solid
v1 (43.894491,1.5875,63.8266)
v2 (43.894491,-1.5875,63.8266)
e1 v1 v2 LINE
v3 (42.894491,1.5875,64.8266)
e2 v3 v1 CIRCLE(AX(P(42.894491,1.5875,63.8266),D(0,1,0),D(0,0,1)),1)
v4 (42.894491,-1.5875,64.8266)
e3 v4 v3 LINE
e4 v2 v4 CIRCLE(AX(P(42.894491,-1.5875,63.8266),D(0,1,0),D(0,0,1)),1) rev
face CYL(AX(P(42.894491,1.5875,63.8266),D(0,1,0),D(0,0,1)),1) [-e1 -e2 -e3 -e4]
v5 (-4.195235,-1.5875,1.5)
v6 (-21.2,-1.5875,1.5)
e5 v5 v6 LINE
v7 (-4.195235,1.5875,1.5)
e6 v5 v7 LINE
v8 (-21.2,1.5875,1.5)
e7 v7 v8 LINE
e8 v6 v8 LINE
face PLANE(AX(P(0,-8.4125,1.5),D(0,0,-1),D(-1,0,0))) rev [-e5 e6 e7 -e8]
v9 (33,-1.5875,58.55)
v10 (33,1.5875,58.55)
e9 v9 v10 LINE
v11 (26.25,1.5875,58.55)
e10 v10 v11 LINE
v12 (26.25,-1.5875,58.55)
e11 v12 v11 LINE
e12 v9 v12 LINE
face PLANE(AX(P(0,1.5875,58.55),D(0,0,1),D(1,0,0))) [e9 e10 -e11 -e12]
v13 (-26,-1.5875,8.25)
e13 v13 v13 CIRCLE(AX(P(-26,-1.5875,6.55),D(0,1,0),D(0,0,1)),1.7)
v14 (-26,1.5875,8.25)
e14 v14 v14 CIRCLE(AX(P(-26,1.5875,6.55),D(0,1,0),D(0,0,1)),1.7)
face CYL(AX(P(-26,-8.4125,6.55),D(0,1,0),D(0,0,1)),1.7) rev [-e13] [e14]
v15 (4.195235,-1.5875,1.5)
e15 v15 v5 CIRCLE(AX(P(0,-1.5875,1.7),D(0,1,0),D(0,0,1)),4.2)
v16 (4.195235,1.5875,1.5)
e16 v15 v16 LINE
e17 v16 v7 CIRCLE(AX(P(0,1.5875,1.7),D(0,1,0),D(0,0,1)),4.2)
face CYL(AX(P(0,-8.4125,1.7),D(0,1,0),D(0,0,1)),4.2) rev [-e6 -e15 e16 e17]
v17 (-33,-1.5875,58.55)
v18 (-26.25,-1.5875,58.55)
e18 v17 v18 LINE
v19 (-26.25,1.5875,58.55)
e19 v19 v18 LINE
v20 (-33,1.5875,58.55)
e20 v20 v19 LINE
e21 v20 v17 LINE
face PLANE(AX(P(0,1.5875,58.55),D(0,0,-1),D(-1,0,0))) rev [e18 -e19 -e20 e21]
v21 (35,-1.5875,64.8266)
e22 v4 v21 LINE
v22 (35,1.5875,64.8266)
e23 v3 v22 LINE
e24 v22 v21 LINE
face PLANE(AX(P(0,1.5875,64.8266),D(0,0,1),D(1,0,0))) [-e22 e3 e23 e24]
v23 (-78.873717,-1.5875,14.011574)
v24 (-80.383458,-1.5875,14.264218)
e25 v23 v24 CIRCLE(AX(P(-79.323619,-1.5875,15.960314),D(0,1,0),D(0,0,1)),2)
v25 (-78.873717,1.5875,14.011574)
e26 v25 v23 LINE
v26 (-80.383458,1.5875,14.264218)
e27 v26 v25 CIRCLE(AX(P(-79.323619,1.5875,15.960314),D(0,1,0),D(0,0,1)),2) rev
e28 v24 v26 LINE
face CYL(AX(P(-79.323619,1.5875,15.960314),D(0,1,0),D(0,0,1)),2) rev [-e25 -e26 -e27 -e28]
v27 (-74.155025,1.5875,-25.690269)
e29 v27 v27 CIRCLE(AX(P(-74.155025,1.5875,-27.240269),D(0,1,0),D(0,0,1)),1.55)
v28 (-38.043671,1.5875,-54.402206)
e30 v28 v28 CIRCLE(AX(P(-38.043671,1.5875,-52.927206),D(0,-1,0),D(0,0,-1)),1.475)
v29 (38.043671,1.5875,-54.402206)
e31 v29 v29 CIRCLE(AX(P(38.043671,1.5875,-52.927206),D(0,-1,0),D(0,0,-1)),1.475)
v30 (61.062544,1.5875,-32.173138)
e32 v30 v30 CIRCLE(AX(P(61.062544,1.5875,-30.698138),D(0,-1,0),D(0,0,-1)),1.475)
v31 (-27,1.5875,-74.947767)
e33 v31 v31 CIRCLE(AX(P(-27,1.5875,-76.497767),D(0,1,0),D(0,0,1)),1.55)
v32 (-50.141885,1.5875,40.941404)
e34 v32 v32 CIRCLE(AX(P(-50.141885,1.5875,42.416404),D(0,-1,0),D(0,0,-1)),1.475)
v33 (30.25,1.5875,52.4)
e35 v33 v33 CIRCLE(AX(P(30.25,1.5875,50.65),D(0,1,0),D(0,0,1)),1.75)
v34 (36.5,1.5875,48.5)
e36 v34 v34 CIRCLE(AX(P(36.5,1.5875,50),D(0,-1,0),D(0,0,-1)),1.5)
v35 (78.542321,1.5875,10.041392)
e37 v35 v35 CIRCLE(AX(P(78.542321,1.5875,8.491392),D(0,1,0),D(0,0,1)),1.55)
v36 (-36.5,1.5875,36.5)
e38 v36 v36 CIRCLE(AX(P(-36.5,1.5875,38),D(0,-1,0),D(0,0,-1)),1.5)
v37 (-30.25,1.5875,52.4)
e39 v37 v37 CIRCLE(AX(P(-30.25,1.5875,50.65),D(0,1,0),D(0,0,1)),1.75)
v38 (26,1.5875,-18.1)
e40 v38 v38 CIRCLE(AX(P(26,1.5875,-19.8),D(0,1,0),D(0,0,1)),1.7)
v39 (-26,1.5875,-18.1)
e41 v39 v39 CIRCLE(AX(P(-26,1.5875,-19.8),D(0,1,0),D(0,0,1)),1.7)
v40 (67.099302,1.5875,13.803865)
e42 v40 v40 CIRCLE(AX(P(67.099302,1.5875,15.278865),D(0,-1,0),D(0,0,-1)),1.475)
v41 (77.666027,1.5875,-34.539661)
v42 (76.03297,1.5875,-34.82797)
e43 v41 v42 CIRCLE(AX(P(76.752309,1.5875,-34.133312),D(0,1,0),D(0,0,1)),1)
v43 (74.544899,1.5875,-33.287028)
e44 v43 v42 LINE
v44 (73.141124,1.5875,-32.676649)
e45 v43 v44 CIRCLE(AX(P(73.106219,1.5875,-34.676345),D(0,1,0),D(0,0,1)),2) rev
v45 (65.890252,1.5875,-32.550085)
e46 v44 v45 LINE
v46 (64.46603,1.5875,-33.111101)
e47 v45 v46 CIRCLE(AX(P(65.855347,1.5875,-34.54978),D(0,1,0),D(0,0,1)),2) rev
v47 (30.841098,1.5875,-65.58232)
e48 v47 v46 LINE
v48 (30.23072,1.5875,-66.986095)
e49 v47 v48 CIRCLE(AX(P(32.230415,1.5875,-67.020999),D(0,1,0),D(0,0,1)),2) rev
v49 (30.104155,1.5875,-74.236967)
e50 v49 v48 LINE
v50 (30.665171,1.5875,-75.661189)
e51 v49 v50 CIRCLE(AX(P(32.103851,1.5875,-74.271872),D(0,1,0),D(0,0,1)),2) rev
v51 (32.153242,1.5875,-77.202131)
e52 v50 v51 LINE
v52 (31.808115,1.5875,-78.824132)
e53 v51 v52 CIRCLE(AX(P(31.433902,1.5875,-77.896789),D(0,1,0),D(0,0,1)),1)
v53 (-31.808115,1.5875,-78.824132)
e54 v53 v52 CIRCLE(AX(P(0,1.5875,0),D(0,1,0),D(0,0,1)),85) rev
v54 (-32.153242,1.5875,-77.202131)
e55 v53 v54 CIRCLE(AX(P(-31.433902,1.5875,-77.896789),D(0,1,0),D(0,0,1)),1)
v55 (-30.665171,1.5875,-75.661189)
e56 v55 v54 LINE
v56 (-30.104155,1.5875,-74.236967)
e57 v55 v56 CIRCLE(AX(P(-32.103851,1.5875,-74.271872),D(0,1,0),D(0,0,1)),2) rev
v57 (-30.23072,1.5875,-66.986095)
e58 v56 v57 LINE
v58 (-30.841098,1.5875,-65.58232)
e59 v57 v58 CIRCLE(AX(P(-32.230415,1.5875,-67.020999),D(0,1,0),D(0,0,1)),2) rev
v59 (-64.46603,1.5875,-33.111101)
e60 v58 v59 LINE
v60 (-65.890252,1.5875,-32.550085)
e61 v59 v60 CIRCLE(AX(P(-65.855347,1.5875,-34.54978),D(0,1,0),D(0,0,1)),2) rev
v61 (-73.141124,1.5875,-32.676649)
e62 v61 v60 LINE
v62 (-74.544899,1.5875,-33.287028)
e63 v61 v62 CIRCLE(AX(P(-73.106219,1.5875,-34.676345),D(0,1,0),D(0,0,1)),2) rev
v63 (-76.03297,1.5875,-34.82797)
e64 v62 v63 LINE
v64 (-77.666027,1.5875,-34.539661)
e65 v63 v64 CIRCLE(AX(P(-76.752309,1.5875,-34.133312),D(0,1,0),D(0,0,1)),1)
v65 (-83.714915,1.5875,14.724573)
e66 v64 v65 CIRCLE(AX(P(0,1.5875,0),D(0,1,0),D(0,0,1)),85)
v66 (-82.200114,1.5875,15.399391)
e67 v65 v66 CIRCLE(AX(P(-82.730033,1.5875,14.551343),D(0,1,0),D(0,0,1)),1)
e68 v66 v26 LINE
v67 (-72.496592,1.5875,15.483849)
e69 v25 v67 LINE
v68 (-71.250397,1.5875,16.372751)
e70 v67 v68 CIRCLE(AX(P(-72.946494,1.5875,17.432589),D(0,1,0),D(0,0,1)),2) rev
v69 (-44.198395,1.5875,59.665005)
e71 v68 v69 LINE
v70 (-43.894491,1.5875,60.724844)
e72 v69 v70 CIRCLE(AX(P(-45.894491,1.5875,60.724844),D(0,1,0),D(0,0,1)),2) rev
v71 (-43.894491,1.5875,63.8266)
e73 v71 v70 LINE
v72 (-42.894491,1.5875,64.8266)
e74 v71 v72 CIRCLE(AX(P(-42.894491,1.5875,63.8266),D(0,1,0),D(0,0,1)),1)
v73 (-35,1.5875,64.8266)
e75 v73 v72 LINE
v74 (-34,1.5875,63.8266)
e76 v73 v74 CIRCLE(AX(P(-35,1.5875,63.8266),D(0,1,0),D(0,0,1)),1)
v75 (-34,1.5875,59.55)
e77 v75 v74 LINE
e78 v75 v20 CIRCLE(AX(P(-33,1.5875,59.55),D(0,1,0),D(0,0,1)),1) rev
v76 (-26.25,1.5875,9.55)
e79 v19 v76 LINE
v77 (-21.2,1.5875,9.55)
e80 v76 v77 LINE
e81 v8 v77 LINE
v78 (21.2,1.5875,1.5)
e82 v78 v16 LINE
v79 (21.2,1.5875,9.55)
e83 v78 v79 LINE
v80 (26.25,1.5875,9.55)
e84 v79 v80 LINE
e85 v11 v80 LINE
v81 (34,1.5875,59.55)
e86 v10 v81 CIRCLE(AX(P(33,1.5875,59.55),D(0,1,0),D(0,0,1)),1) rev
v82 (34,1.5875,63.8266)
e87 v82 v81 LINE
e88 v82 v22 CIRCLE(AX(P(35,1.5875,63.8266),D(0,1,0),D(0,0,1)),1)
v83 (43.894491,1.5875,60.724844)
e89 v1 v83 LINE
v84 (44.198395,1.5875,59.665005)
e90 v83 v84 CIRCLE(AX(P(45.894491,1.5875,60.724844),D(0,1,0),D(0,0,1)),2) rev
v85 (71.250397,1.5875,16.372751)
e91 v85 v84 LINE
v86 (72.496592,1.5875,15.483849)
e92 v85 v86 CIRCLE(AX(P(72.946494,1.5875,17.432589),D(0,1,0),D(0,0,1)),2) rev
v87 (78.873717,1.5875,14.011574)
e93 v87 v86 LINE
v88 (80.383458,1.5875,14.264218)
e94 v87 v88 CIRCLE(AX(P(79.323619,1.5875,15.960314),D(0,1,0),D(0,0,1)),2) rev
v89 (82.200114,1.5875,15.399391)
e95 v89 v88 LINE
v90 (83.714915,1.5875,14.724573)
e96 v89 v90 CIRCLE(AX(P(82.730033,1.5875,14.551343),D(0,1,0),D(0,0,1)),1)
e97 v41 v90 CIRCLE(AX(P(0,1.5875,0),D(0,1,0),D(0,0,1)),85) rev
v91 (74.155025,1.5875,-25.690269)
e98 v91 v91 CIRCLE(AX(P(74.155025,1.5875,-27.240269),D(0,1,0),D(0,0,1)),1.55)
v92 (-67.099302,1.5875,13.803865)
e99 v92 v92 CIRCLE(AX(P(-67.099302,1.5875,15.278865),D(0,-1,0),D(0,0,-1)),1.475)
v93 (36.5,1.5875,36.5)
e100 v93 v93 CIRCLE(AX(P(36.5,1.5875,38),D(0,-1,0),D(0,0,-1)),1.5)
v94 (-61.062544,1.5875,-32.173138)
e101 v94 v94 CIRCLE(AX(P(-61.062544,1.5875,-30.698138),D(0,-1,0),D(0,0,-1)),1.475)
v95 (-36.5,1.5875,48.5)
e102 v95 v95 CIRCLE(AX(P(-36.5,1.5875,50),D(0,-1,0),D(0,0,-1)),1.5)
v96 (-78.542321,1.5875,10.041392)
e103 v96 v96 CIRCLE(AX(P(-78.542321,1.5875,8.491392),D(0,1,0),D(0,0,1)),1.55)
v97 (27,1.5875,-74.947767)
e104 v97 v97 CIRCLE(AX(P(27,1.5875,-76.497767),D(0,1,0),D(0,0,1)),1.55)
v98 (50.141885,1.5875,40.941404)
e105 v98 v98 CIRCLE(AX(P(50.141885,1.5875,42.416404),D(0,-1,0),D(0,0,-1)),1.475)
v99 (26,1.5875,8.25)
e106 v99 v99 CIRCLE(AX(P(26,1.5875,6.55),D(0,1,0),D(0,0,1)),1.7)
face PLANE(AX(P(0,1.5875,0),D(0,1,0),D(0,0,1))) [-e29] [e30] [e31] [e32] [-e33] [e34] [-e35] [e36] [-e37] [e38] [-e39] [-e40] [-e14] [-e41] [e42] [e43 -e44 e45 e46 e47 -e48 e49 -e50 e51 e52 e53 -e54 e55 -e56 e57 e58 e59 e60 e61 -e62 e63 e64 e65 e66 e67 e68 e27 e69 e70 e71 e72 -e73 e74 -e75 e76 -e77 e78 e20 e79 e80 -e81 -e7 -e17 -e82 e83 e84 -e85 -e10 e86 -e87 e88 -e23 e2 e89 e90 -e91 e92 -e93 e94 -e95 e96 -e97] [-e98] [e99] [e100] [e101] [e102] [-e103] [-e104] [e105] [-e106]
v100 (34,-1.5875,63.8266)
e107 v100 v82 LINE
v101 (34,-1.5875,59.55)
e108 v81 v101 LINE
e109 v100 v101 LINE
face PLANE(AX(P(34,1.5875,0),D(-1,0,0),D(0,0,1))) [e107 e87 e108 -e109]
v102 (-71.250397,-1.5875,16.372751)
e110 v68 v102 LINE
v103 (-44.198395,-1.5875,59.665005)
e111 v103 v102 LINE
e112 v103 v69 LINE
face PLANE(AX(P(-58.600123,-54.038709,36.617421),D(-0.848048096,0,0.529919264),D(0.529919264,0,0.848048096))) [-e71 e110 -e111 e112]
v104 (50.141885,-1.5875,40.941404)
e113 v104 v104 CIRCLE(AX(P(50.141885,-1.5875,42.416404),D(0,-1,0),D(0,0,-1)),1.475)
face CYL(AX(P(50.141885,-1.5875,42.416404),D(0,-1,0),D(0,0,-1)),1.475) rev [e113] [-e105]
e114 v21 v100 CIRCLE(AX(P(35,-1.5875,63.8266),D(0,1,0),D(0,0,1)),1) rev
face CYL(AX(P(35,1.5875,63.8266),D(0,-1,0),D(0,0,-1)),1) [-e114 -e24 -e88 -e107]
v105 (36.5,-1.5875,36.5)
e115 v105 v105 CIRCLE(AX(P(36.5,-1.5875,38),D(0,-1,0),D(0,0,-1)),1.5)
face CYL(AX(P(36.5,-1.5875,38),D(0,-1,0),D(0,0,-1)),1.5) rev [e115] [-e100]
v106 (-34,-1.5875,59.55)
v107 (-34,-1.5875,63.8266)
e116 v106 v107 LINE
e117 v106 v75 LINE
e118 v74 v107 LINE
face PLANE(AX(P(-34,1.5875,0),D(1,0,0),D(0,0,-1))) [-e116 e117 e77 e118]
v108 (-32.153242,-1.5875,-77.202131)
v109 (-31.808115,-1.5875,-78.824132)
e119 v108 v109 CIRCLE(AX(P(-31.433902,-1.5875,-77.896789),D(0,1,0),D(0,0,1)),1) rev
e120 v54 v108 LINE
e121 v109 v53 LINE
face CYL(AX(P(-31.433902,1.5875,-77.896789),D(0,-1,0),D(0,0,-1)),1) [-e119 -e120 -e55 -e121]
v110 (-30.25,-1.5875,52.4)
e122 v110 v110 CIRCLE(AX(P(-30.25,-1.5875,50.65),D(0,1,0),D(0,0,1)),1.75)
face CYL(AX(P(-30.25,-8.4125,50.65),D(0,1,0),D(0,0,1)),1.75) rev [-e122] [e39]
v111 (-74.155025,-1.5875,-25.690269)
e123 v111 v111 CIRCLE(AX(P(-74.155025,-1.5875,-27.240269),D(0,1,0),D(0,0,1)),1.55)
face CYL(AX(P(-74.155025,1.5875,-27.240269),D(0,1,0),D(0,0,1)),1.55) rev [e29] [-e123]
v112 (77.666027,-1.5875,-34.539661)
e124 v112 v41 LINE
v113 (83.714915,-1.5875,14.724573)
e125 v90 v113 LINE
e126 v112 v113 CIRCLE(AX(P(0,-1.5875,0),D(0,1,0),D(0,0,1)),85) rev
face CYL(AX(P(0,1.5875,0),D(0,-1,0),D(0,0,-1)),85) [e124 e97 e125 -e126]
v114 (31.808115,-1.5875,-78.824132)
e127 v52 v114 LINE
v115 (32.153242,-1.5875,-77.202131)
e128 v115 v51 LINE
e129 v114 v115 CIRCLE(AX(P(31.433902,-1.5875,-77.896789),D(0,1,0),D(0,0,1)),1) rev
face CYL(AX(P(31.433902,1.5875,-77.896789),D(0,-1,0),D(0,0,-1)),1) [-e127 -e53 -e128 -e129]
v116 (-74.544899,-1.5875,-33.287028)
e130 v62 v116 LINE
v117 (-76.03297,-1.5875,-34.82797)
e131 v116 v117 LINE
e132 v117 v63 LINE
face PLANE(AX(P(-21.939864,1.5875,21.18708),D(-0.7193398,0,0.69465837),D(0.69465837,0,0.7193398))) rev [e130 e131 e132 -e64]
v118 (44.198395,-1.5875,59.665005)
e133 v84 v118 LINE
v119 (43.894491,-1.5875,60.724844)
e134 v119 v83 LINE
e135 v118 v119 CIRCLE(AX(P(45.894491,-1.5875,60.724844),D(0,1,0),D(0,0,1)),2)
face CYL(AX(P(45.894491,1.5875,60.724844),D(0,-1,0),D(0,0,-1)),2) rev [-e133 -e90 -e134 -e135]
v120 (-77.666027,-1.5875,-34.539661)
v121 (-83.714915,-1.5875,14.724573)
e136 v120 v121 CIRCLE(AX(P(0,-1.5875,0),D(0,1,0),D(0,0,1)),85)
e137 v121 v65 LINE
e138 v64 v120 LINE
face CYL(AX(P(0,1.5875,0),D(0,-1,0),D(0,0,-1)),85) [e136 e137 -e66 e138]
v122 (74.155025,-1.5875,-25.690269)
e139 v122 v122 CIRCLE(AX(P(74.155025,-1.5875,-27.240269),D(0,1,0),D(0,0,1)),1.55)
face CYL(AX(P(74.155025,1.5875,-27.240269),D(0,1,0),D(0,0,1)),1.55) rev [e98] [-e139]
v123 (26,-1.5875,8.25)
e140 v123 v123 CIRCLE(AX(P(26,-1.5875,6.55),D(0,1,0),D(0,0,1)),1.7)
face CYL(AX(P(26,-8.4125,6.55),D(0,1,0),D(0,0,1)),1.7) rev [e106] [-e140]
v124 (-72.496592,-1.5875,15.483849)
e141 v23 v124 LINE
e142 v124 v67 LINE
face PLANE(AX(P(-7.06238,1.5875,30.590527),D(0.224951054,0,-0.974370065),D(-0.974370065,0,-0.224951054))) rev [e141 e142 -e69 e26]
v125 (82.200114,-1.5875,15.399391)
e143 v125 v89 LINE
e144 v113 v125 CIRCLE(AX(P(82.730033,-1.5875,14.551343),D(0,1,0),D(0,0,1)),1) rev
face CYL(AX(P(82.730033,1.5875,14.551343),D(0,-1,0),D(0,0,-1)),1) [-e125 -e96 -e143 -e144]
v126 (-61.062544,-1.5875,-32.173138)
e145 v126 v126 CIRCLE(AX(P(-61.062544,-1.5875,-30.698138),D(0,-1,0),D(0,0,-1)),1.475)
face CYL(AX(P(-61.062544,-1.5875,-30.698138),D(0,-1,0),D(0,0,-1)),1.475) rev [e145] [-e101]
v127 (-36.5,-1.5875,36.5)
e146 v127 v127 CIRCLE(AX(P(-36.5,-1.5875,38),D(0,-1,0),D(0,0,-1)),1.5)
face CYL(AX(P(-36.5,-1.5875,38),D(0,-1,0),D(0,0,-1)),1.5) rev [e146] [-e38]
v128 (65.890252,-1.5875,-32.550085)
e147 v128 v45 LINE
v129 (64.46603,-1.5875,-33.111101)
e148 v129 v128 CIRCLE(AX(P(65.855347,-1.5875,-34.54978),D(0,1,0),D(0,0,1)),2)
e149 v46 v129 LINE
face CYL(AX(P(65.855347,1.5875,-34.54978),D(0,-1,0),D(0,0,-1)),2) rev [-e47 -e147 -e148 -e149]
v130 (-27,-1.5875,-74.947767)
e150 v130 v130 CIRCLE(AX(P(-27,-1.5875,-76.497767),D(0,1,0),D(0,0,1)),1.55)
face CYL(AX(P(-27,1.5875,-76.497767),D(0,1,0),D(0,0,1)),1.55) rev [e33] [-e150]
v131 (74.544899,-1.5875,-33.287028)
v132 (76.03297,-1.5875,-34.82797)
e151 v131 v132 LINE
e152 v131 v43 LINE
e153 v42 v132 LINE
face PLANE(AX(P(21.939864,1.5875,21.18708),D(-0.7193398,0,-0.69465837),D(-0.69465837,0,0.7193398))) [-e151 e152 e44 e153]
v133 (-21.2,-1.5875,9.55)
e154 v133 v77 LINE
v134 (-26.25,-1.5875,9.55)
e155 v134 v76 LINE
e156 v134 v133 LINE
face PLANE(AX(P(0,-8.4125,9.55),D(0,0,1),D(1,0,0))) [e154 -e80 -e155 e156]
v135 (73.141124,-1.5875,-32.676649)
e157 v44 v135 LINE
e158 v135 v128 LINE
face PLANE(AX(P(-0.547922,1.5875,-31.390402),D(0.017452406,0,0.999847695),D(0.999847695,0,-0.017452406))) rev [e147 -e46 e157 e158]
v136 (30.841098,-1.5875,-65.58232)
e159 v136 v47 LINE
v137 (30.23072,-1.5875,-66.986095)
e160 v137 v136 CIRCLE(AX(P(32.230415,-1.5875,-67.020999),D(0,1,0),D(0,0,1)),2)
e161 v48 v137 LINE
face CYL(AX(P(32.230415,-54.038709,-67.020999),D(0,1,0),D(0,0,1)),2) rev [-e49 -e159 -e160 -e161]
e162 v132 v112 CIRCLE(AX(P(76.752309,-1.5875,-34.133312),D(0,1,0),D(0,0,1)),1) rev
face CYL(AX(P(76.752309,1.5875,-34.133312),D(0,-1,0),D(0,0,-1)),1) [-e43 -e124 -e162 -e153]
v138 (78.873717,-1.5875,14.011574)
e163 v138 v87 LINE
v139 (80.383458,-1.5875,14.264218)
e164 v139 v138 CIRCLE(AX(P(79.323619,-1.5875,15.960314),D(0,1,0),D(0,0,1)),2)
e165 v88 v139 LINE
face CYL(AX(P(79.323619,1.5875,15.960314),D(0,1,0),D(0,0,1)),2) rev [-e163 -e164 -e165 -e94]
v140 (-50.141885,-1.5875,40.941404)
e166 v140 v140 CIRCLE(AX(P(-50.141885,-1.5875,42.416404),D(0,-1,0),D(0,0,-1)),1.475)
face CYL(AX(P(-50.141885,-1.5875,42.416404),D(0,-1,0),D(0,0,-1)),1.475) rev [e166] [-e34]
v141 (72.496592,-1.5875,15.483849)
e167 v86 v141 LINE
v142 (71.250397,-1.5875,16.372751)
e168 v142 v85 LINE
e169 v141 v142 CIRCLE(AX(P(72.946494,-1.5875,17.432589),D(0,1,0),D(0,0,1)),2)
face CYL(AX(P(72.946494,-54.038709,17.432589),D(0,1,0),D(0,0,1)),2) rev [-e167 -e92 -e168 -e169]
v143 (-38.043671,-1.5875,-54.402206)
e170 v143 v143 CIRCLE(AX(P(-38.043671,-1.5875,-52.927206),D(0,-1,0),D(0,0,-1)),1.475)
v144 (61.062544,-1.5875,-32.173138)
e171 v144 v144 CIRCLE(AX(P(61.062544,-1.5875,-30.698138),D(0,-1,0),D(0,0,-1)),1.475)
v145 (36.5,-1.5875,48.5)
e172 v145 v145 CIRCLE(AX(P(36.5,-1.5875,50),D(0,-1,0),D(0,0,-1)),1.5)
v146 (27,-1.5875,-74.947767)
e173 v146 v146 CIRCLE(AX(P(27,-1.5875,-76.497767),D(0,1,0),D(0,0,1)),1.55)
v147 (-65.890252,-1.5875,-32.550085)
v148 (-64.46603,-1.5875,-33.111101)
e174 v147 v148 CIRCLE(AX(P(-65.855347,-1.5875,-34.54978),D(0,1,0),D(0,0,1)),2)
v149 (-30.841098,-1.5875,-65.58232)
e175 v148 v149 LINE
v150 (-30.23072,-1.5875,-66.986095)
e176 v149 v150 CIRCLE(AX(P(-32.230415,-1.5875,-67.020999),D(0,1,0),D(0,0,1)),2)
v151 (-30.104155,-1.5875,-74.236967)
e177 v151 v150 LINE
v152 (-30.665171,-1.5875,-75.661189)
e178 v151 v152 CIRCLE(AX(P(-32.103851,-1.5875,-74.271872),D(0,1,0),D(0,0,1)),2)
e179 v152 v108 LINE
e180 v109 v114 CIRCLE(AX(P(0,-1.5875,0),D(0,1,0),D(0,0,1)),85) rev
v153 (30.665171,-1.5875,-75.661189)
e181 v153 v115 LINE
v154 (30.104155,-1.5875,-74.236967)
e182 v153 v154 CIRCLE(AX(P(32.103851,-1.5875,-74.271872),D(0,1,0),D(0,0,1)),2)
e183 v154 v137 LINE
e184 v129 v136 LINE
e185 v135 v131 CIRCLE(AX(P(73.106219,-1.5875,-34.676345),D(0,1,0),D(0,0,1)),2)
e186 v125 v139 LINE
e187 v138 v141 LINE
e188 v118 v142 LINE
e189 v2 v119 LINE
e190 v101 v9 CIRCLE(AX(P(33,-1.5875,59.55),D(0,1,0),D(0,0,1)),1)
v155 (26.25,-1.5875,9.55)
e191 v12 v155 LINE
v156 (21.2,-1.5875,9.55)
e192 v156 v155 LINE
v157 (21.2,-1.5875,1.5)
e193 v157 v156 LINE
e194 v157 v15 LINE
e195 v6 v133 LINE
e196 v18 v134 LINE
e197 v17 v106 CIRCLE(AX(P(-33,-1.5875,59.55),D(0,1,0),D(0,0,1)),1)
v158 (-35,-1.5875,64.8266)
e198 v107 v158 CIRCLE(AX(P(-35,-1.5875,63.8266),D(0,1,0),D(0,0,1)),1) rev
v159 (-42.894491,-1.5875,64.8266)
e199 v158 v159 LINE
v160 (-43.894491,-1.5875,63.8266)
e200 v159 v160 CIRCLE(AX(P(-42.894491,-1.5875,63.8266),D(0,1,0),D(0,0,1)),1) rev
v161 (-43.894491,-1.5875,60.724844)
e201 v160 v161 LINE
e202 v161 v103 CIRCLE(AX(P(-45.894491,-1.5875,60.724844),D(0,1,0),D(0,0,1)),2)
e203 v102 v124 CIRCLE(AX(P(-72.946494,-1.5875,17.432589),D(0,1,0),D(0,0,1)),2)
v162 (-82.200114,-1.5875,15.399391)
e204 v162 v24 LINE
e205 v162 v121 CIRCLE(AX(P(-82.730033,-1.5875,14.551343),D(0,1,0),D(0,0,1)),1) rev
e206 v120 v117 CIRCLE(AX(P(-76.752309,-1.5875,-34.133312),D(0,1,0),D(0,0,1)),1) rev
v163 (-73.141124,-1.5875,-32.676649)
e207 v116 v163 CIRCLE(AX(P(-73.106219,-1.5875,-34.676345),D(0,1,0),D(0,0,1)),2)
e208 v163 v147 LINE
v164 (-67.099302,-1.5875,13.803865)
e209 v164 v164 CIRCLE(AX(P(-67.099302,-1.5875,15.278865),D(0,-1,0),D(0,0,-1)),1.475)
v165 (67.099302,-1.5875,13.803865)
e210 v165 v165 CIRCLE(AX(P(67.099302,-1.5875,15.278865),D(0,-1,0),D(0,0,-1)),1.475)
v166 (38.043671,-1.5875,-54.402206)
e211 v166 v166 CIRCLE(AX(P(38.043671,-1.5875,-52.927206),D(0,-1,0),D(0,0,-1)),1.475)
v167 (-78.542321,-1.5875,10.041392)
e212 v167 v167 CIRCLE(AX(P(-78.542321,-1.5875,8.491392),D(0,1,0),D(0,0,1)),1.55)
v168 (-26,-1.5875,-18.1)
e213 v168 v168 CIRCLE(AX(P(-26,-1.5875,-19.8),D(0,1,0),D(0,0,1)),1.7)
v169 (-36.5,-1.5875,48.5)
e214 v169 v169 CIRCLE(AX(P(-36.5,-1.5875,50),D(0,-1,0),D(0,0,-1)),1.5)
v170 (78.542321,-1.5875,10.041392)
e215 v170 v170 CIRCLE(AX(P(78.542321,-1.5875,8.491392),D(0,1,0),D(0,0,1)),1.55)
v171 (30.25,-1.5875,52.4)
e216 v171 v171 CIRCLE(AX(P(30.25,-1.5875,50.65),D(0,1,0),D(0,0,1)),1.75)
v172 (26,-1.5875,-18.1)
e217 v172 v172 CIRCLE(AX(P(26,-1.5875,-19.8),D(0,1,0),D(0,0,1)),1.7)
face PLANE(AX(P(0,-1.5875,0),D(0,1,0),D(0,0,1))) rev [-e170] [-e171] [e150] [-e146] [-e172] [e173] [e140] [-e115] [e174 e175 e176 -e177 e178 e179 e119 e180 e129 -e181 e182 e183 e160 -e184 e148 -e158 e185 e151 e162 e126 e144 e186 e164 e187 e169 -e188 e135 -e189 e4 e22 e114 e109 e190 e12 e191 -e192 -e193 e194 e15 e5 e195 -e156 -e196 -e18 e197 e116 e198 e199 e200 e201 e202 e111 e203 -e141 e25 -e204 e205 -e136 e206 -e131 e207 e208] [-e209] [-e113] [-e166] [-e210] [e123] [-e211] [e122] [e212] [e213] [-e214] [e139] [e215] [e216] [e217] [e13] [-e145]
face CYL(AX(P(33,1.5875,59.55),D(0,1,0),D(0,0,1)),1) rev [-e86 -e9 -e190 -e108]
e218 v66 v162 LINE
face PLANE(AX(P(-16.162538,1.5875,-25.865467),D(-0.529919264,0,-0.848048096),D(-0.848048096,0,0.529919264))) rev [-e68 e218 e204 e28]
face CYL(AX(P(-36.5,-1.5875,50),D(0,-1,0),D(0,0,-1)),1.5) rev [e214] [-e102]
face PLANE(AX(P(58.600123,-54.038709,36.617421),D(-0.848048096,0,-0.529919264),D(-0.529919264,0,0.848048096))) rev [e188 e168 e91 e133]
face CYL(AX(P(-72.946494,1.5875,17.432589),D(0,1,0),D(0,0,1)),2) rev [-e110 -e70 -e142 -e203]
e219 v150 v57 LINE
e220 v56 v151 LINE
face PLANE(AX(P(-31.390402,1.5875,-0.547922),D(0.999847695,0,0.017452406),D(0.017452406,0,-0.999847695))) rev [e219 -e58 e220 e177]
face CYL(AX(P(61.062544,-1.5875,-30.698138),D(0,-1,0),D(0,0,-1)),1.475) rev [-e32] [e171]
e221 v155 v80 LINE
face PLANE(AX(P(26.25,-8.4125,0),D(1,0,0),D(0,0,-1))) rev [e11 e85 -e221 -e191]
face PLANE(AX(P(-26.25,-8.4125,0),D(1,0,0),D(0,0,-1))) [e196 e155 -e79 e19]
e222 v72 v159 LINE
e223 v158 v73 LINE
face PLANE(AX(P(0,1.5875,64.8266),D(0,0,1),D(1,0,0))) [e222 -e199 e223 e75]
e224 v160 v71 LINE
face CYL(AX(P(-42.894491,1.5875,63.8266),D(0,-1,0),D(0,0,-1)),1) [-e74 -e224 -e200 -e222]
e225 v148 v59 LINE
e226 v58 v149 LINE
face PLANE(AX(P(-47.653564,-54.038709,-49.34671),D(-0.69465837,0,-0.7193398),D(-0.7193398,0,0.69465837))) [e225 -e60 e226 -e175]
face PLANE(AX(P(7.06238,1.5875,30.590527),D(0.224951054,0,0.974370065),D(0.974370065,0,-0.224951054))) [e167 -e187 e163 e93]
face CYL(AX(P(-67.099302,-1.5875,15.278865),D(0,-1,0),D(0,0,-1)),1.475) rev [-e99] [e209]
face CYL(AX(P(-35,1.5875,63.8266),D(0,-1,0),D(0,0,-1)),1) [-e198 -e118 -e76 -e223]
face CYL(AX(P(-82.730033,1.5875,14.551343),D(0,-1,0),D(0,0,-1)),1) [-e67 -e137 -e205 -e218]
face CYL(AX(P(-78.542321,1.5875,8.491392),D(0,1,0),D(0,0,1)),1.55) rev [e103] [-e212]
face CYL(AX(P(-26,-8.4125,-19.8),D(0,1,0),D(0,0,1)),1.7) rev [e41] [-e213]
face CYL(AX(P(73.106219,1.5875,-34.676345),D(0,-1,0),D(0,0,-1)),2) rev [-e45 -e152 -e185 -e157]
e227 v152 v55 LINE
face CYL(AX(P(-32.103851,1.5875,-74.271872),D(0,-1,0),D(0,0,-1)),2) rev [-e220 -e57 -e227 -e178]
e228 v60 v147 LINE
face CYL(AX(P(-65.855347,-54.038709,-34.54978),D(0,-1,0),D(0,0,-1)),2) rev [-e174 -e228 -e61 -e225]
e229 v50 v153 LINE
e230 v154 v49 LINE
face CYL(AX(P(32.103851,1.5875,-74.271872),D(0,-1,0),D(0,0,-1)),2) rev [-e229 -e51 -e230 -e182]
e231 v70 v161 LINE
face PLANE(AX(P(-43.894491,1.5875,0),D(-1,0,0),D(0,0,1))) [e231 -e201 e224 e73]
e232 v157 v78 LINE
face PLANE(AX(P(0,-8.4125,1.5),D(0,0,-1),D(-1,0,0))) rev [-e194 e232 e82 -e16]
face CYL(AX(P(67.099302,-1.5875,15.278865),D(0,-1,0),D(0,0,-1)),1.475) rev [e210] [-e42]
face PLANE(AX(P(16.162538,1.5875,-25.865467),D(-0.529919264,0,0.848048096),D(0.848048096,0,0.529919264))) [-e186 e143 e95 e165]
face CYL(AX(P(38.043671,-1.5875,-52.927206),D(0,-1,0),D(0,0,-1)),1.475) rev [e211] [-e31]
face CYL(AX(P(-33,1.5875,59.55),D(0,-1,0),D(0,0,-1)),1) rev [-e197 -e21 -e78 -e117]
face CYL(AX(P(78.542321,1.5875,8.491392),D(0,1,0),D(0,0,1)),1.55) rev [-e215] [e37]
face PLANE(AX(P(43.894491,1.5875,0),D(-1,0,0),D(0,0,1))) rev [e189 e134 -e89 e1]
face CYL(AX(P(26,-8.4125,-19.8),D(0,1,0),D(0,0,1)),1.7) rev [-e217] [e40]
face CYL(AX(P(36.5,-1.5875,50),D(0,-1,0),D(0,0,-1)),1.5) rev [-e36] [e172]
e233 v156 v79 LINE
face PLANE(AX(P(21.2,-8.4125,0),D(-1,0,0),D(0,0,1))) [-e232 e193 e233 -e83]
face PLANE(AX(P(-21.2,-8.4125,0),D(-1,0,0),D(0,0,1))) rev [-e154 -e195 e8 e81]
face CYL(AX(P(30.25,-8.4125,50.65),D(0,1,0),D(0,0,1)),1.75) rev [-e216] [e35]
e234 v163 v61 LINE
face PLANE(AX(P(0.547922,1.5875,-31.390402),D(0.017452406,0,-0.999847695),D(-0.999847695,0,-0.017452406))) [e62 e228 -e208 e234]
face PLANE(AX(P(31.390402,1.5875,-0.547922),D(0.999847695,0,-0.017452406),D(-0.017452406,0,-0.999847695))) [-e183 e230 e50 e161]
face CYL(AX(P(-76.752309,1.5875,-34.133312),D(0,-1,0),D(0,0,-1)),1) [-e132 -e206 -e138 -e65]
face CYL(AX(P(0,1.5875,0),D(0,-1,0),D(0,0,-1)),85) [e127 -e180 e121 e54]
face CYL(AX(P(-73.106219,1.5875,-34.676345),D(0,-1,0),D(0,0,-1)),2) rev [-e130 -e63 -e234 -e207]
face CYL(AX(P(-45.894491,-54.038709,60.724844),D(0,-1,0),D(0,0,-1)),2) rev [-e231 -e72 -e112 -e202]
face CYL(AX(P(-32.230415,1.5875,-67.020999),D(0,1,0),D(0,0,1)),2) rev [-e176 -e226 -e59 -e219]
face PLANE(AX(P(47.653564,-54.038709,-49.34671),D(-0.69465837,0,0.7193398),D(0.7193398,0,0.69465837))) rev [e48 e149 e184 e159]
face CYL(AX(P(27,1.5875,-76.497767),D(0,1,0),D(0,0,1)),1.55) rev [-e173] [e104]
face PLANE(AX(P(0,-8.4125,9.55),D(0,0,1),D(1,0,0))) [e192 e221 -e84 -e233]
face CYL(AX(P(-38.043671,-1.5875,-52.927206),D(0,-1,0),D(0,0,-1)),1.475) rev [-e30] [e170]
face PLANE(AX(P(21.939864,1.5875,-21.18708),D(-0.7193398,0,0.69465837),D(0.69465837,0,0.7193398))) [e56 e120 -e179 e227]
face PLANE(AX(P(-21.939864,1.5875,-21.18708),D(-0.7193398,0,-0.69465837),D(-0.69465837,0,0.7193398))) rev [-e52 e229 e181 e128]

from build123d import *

# Parameters (mm, degrees)
BOSS_EXTRUDE4_DEPTH  = 1.5875
M3_CLEARANCE_HOLE3_D = 3
M3_CLEARANCE_HOLE1_D = 3.1
M3_CLEARANCE_HOLE4_D = 2.95
M3_CLEARANCE_HOLE2_D = 3.1
BOSS_EXTRUDE6_DEPTH  = 3.175
FILLET1_R            = 2
FILLET3_R            = 1
FILLET6_R            = 0.5
CUT_EXTRUDE4_DEPTH   = 10
SKETCH29_R           = 1.75
CUT_EXTRUDE5_DEPTH   = 10
SKETCH31_R           = 1.7
CUT_EXTRUDE7_DEPTH   = 10


with BuildPart() as part:
    # Sketch1 → Boss-Extrude4 (new, symmetric)
    with BuildSketch(Plane(origin=(0, 0, 0), x_dir=(1, 0, 0), z_dir=(0, 1, 0))):
        with BuildLine():
            Line((-62.799553621, 32.496136604), (-73.969425011, 32.691107434))
            Line((-73.969425011, 32.691107434), (-77.053684287, 35.88495141))
            ThreePointArc((-77.053684287, 35.88495141), (-84.36642289, 10.358894189), (-83.446216027, -16.178041625))
            Line((-83.446216027, -16.178041625), (-79.680911643, -13.825218315))
            Line((-79.680911643, -13.825218315), (-69.484649137, -16.179210996))
            Line((-69.484649137, -16.179210996), (-43.894490772, -57.132025032))
            Line((-43.894490772, -57.132025032), (-43.894490772, -64.826600275))
            Line((-43.894490772, -64.826600275), (-43.094490772, -64.826600275))
            Line((-43.094490772, -64.826600275), (-34, -64.826600275))
            Line((-34, -64.826600275), (-34, -59.55))
            Line((-34, -59.55), (-34, -58.55))
            Line((-34, -58.55), (-20, -58.55))
            Line((-20, -58.55), (-19.859459165, -59.55))
            Line((-19.859459165, -59.55), (19.859459165, -59.55))
            Line((19.859459165, -59.55), (20, -58.55))
            Line((20, -58.55), (34, -58.55))
            Line((34, -58.55), (34, -59.55))
            Line((34, -59.55), (34, -64.826600275))
            Line((34, -64.826600275), (43.094490772, -64.826600275))
            Line((43.094490772, -64.826600275), (43.894490772, -64.826600275))
            Line((43.894490772, -64.826600275), (43.894490772, -57.132025032))
            Line((43.894490772, -57.132025032), (69.484649137, -16.179210996))
            Line((69.484649137, -16.179210996), (79.680911643, -13.825218315))
            Line((79.680911643, -13.825218315), (83.446216027, -16.178041625))
            ThreePointArc((83.446216027, -16.178041625), (84.610662337, -8.126242604), (85, 0))
            ThreePointArc((85, 0), (82.98964744, 18.377116688), (77.053684287, 35.88495141))
            Line((77.053684287, 35.88495141), (73.969425011, 32.691107434))
            Line((73.969425011, 32.691107434), (62.799553621, 32.496136604))
            Line((62.799553621, 32.496136604), (30.284668021, 63.895396642))
            Line((30.284668021, 63.895396642), (30.089697191, 75.065268032))
            Line((30.089697191, 75.065268032), (33.173956467, 78.259112008))
            ThreePointArc((33.173956467, 78.259112008), (0, 85), (-33.173956467, 78.259112008))
            Line((-33.173956467, 78.259112008), (-30.089697191, 75.065268032))
            Line((-30.089697191, 75.065268032), (-30.284668021, 63.895396642))
            Line((-30.284668021, 63.895396642), (-62.799553621, 32.496136604))
        make_face()
    extrude(amount=BOSS_EXTRUDE4_DEPTH, both=True)

    # M3 Clearance Hole3 (through all)
    with Locations(Plane(origin=(0, -1.5875, 0), x_dir=(-1, 0, 0), z_dir=(0, -1, 0))):
        with Locations((36.5, -50), (36.5, -38), (-36.5, -50), (-36.5, -38)):
            Hole(M3_CLEARANCE_HOLE3_D / 2)

    # M3 Clearance Hole1 (through all)
    with Locations(Plane(origin=(0, 1.5875, 0), x_dir=(1, 0, 0), z_dir=(0, 1, 0))):
        with Locations((-78.542321426, -8.49139241), (78.542321426, -8.49139241), (74.155025063, 27.240269049), (-74.155025063, 27.240269049)):
            Hole(M3_CLEARANCE_HOLE1_D / 2)

    # M3 Clearance Hole4 (through all)
    with Locations(Plane(origin=(0, -1.5875, 0), x_dir=(-1, 0, 0), z_dir=(0, -1, 0))):
        with Locations((-67.099301622, -15.278865202), (-50.141885166, -42.416404279), (-61.062544382, 30.698137949), (-38.043670771, 52.927205804), (50.141885166, -42.416404279), (67.099301622, -15.278865202), (38.043670771, 52.927205804), (61.062544382, 30.698137949)):
            Hole(M3_CLEARANCE_HOLE4_D / 2)

    # M3 Clearance Hole2 (through all)
    with Locations(Plane(origin=(0, 1.5875, 0), x_dir=(1, 0, 0), z_dir=(0, 1, 0))):
        with Locations((27, 76.497766718), (-27, 76.497766718)):
            Hole(M3_CLEARANCE_HOLE2_D / 2)

    # Sketch22 → Boss-Extrude6 (add)
    with BuildSketch(Plane(origin=(0, 1.5875, 0), x_dir=(1, 0, 0), z_dir=(0, 1, 0))):
        Polygon((65.061950694, 32.535626892), (30.245177733, 66.157793715), (30.284668021, 63.895396642), (62.799553621, 32.496136604), align=None)
        Polygon((-30.284668021, 63.895396642), (-30.245177733, 66.157793715), (-65.061950694, 32.535626892), (-62.799553621, 32.496136604), align=None)
        Polygon((43.894490772, -60.151352895), (71.689396914, -15.670204865), (69.484649137, -16.179210996), (43.894490772, -57.132025032), align=None)
        Polygon((-69.484649137, -16.179210996), (-71.689396914, -15.670204865), (-43.894490772, -60.151352895), (-43.894490772, -57.132025032), align=None)
    extrude(amount=-BOSS_EXTRUDE6_DEPTH)

    # Fillet1
    fillet1_edges = [part.edges().sort_by_distance(p)[0] for p in [
        (-30.245177733, 0.79375, -66.157793715),
        (-65.061950694, 0.79375, -32.535626892),
        (-71.689396914, 0.79375, 15.670204865),
        (-43.894490772, 0.79375, 60.151352895),
        (43.894490772, -0.79375, 60.151352895),
        (71.689396914, -0.79375, 15.670204865),
        (65.061950694, 0.79375, -32.535626892),
        (30.245177733, -0.79375, -66.157793715),
        (30.089697191, -0.79375, -75.065268032),
        (73.969425011, -0.79375, -32.691107434),
        (79.680911643, -0.79375, 13.825218315),
        (-79.680911643, -0.79375, 13.825218315),
        (-73.969425011, -0.79375, -32.691107434),
        (-30.089697191, -0.79375, -75.065268032),
    ]]
    fillet(fillet1_edges, radius=FILLET1_R)

    # Fillet3
    fillet3_edges = [part.edges().sort_by_distance(p)[0] for p in [
        (33.173956467, -0.79375, -78.259112008),
        (77.053684287, 0.79375, -35.88495141),
        (83.446216027, -0.79375, 16.178041625),
        (43.894490772, -0.79375, 64.826600275),
        (34, 0.79375, 64.826600275),
        (34, -0.79375, 58.55),
        (-34, -0.79375, 58.55),
        (-34, 0.79375, 64.826600275),
        (-43.894490772, -0.79375, 64.826600275),
        (-83.446216027, -0.79375, 16.178041625),
        (-77.053684287, -0.79375, -35.88495141),
        (-33.173956467, -0.79375, -78.259112008),
    ]]
    fillet(fillet3_edges, radius=FILLET3_R - 0.0001)  # a hair under: the kernel refuses the full size

    # Fillet6
    fillet6_edges = [part.edges().sort_by_distance(p)[0] for p in [
        (20, -0.79375, 58.55),
        (19.859459165, -0.79375, 59.55),
        (-19.859459165, 0.79375, 59.55),
        (-20, 0.79375, 58.55),
    ]]
    fillet(fillet6_edges, radius=FILLET6_R)

    # Sketch28 → Cut-Extrude4 (cut)
    with BuildSketch(Plane(origin=(0, 1.5875, 0), x_dir=(1, 0, 0), z_dir=(0, 1, 0))):
        with BuildLine():
            Line((-26.25, -9.55), (-26.25, -59.55))
            Line((-26.25, -59.55), (26.25, -59.55))
            Line((26.25, -59.55), (26.25, -9.55))
            Line((26.25, -9.55), (21.2, -9.55))
            Line((21.2, -9.55), (21.2, -1.5))
            Line((21.2, -1.5), (4.195235393, -1.5))
            ThreePointArc((4.195235393, -1.5), (0, 2.5), (-4.195235393, -1.5))
            Line((-4.195235393, -1.5), (-21.2, -1.5))
            Line((-21.2, -1.5), (-21.2, -9.55))
            Line((-21.2, -9.55), (-26.25, -9.55))
        make_face()
    extrude(amount=-CUT_EXTRUDE4_DEPTH, mode=Mode.SUBTRACT)

    # Sketch29 → Cut-Extrude5 (cut)
    with BuildSketch(Plane(origin=(0, 1.5875, 0), x_dir=(1, 0, 0), z_dir=(0, 1, 0))):
        with Locations(Location((30.25, -50.65, 0), (0, 0, 270))):
            Circle(SKETCH29_R)
        with Locations(Location((-30.25, -50.65, 0), (0, 0, 270))):
            Circle(SKETCH29_R)
    extrude(amount=-CUT_EXTRUDE5_DEPTH, mode=Mode.SUBTRACT)

    # Sketch31 → Cut-Extrude7 (cut)
    with BuildSketch(Plane(origin=(0, 1.5875, 0), x_dir=(1, 0, 0), z_dir=(0, 1, 0))):
        with Locations(Location((-26, -6.55, 0), (0, 0, 270))):
            Circle(SKETCH31_R)
        with Locations(Location((26, -6.55, 0), (0, 0, 270))):
            Circle(SKETCH31_R)
        with Locations(Location((-26, 19.8, 0), (0, 0, 270))):
            Circle(SKETCH31_R)
        with Locations(Location((26, 19.8, 0), (0, 0, 270))):
            Circle(SKETCH31_R)
    extrude(amount=-CUT_EXTRUDE7_DEPTH, mode=Mode.SUBTRACT)


solid = part.part
